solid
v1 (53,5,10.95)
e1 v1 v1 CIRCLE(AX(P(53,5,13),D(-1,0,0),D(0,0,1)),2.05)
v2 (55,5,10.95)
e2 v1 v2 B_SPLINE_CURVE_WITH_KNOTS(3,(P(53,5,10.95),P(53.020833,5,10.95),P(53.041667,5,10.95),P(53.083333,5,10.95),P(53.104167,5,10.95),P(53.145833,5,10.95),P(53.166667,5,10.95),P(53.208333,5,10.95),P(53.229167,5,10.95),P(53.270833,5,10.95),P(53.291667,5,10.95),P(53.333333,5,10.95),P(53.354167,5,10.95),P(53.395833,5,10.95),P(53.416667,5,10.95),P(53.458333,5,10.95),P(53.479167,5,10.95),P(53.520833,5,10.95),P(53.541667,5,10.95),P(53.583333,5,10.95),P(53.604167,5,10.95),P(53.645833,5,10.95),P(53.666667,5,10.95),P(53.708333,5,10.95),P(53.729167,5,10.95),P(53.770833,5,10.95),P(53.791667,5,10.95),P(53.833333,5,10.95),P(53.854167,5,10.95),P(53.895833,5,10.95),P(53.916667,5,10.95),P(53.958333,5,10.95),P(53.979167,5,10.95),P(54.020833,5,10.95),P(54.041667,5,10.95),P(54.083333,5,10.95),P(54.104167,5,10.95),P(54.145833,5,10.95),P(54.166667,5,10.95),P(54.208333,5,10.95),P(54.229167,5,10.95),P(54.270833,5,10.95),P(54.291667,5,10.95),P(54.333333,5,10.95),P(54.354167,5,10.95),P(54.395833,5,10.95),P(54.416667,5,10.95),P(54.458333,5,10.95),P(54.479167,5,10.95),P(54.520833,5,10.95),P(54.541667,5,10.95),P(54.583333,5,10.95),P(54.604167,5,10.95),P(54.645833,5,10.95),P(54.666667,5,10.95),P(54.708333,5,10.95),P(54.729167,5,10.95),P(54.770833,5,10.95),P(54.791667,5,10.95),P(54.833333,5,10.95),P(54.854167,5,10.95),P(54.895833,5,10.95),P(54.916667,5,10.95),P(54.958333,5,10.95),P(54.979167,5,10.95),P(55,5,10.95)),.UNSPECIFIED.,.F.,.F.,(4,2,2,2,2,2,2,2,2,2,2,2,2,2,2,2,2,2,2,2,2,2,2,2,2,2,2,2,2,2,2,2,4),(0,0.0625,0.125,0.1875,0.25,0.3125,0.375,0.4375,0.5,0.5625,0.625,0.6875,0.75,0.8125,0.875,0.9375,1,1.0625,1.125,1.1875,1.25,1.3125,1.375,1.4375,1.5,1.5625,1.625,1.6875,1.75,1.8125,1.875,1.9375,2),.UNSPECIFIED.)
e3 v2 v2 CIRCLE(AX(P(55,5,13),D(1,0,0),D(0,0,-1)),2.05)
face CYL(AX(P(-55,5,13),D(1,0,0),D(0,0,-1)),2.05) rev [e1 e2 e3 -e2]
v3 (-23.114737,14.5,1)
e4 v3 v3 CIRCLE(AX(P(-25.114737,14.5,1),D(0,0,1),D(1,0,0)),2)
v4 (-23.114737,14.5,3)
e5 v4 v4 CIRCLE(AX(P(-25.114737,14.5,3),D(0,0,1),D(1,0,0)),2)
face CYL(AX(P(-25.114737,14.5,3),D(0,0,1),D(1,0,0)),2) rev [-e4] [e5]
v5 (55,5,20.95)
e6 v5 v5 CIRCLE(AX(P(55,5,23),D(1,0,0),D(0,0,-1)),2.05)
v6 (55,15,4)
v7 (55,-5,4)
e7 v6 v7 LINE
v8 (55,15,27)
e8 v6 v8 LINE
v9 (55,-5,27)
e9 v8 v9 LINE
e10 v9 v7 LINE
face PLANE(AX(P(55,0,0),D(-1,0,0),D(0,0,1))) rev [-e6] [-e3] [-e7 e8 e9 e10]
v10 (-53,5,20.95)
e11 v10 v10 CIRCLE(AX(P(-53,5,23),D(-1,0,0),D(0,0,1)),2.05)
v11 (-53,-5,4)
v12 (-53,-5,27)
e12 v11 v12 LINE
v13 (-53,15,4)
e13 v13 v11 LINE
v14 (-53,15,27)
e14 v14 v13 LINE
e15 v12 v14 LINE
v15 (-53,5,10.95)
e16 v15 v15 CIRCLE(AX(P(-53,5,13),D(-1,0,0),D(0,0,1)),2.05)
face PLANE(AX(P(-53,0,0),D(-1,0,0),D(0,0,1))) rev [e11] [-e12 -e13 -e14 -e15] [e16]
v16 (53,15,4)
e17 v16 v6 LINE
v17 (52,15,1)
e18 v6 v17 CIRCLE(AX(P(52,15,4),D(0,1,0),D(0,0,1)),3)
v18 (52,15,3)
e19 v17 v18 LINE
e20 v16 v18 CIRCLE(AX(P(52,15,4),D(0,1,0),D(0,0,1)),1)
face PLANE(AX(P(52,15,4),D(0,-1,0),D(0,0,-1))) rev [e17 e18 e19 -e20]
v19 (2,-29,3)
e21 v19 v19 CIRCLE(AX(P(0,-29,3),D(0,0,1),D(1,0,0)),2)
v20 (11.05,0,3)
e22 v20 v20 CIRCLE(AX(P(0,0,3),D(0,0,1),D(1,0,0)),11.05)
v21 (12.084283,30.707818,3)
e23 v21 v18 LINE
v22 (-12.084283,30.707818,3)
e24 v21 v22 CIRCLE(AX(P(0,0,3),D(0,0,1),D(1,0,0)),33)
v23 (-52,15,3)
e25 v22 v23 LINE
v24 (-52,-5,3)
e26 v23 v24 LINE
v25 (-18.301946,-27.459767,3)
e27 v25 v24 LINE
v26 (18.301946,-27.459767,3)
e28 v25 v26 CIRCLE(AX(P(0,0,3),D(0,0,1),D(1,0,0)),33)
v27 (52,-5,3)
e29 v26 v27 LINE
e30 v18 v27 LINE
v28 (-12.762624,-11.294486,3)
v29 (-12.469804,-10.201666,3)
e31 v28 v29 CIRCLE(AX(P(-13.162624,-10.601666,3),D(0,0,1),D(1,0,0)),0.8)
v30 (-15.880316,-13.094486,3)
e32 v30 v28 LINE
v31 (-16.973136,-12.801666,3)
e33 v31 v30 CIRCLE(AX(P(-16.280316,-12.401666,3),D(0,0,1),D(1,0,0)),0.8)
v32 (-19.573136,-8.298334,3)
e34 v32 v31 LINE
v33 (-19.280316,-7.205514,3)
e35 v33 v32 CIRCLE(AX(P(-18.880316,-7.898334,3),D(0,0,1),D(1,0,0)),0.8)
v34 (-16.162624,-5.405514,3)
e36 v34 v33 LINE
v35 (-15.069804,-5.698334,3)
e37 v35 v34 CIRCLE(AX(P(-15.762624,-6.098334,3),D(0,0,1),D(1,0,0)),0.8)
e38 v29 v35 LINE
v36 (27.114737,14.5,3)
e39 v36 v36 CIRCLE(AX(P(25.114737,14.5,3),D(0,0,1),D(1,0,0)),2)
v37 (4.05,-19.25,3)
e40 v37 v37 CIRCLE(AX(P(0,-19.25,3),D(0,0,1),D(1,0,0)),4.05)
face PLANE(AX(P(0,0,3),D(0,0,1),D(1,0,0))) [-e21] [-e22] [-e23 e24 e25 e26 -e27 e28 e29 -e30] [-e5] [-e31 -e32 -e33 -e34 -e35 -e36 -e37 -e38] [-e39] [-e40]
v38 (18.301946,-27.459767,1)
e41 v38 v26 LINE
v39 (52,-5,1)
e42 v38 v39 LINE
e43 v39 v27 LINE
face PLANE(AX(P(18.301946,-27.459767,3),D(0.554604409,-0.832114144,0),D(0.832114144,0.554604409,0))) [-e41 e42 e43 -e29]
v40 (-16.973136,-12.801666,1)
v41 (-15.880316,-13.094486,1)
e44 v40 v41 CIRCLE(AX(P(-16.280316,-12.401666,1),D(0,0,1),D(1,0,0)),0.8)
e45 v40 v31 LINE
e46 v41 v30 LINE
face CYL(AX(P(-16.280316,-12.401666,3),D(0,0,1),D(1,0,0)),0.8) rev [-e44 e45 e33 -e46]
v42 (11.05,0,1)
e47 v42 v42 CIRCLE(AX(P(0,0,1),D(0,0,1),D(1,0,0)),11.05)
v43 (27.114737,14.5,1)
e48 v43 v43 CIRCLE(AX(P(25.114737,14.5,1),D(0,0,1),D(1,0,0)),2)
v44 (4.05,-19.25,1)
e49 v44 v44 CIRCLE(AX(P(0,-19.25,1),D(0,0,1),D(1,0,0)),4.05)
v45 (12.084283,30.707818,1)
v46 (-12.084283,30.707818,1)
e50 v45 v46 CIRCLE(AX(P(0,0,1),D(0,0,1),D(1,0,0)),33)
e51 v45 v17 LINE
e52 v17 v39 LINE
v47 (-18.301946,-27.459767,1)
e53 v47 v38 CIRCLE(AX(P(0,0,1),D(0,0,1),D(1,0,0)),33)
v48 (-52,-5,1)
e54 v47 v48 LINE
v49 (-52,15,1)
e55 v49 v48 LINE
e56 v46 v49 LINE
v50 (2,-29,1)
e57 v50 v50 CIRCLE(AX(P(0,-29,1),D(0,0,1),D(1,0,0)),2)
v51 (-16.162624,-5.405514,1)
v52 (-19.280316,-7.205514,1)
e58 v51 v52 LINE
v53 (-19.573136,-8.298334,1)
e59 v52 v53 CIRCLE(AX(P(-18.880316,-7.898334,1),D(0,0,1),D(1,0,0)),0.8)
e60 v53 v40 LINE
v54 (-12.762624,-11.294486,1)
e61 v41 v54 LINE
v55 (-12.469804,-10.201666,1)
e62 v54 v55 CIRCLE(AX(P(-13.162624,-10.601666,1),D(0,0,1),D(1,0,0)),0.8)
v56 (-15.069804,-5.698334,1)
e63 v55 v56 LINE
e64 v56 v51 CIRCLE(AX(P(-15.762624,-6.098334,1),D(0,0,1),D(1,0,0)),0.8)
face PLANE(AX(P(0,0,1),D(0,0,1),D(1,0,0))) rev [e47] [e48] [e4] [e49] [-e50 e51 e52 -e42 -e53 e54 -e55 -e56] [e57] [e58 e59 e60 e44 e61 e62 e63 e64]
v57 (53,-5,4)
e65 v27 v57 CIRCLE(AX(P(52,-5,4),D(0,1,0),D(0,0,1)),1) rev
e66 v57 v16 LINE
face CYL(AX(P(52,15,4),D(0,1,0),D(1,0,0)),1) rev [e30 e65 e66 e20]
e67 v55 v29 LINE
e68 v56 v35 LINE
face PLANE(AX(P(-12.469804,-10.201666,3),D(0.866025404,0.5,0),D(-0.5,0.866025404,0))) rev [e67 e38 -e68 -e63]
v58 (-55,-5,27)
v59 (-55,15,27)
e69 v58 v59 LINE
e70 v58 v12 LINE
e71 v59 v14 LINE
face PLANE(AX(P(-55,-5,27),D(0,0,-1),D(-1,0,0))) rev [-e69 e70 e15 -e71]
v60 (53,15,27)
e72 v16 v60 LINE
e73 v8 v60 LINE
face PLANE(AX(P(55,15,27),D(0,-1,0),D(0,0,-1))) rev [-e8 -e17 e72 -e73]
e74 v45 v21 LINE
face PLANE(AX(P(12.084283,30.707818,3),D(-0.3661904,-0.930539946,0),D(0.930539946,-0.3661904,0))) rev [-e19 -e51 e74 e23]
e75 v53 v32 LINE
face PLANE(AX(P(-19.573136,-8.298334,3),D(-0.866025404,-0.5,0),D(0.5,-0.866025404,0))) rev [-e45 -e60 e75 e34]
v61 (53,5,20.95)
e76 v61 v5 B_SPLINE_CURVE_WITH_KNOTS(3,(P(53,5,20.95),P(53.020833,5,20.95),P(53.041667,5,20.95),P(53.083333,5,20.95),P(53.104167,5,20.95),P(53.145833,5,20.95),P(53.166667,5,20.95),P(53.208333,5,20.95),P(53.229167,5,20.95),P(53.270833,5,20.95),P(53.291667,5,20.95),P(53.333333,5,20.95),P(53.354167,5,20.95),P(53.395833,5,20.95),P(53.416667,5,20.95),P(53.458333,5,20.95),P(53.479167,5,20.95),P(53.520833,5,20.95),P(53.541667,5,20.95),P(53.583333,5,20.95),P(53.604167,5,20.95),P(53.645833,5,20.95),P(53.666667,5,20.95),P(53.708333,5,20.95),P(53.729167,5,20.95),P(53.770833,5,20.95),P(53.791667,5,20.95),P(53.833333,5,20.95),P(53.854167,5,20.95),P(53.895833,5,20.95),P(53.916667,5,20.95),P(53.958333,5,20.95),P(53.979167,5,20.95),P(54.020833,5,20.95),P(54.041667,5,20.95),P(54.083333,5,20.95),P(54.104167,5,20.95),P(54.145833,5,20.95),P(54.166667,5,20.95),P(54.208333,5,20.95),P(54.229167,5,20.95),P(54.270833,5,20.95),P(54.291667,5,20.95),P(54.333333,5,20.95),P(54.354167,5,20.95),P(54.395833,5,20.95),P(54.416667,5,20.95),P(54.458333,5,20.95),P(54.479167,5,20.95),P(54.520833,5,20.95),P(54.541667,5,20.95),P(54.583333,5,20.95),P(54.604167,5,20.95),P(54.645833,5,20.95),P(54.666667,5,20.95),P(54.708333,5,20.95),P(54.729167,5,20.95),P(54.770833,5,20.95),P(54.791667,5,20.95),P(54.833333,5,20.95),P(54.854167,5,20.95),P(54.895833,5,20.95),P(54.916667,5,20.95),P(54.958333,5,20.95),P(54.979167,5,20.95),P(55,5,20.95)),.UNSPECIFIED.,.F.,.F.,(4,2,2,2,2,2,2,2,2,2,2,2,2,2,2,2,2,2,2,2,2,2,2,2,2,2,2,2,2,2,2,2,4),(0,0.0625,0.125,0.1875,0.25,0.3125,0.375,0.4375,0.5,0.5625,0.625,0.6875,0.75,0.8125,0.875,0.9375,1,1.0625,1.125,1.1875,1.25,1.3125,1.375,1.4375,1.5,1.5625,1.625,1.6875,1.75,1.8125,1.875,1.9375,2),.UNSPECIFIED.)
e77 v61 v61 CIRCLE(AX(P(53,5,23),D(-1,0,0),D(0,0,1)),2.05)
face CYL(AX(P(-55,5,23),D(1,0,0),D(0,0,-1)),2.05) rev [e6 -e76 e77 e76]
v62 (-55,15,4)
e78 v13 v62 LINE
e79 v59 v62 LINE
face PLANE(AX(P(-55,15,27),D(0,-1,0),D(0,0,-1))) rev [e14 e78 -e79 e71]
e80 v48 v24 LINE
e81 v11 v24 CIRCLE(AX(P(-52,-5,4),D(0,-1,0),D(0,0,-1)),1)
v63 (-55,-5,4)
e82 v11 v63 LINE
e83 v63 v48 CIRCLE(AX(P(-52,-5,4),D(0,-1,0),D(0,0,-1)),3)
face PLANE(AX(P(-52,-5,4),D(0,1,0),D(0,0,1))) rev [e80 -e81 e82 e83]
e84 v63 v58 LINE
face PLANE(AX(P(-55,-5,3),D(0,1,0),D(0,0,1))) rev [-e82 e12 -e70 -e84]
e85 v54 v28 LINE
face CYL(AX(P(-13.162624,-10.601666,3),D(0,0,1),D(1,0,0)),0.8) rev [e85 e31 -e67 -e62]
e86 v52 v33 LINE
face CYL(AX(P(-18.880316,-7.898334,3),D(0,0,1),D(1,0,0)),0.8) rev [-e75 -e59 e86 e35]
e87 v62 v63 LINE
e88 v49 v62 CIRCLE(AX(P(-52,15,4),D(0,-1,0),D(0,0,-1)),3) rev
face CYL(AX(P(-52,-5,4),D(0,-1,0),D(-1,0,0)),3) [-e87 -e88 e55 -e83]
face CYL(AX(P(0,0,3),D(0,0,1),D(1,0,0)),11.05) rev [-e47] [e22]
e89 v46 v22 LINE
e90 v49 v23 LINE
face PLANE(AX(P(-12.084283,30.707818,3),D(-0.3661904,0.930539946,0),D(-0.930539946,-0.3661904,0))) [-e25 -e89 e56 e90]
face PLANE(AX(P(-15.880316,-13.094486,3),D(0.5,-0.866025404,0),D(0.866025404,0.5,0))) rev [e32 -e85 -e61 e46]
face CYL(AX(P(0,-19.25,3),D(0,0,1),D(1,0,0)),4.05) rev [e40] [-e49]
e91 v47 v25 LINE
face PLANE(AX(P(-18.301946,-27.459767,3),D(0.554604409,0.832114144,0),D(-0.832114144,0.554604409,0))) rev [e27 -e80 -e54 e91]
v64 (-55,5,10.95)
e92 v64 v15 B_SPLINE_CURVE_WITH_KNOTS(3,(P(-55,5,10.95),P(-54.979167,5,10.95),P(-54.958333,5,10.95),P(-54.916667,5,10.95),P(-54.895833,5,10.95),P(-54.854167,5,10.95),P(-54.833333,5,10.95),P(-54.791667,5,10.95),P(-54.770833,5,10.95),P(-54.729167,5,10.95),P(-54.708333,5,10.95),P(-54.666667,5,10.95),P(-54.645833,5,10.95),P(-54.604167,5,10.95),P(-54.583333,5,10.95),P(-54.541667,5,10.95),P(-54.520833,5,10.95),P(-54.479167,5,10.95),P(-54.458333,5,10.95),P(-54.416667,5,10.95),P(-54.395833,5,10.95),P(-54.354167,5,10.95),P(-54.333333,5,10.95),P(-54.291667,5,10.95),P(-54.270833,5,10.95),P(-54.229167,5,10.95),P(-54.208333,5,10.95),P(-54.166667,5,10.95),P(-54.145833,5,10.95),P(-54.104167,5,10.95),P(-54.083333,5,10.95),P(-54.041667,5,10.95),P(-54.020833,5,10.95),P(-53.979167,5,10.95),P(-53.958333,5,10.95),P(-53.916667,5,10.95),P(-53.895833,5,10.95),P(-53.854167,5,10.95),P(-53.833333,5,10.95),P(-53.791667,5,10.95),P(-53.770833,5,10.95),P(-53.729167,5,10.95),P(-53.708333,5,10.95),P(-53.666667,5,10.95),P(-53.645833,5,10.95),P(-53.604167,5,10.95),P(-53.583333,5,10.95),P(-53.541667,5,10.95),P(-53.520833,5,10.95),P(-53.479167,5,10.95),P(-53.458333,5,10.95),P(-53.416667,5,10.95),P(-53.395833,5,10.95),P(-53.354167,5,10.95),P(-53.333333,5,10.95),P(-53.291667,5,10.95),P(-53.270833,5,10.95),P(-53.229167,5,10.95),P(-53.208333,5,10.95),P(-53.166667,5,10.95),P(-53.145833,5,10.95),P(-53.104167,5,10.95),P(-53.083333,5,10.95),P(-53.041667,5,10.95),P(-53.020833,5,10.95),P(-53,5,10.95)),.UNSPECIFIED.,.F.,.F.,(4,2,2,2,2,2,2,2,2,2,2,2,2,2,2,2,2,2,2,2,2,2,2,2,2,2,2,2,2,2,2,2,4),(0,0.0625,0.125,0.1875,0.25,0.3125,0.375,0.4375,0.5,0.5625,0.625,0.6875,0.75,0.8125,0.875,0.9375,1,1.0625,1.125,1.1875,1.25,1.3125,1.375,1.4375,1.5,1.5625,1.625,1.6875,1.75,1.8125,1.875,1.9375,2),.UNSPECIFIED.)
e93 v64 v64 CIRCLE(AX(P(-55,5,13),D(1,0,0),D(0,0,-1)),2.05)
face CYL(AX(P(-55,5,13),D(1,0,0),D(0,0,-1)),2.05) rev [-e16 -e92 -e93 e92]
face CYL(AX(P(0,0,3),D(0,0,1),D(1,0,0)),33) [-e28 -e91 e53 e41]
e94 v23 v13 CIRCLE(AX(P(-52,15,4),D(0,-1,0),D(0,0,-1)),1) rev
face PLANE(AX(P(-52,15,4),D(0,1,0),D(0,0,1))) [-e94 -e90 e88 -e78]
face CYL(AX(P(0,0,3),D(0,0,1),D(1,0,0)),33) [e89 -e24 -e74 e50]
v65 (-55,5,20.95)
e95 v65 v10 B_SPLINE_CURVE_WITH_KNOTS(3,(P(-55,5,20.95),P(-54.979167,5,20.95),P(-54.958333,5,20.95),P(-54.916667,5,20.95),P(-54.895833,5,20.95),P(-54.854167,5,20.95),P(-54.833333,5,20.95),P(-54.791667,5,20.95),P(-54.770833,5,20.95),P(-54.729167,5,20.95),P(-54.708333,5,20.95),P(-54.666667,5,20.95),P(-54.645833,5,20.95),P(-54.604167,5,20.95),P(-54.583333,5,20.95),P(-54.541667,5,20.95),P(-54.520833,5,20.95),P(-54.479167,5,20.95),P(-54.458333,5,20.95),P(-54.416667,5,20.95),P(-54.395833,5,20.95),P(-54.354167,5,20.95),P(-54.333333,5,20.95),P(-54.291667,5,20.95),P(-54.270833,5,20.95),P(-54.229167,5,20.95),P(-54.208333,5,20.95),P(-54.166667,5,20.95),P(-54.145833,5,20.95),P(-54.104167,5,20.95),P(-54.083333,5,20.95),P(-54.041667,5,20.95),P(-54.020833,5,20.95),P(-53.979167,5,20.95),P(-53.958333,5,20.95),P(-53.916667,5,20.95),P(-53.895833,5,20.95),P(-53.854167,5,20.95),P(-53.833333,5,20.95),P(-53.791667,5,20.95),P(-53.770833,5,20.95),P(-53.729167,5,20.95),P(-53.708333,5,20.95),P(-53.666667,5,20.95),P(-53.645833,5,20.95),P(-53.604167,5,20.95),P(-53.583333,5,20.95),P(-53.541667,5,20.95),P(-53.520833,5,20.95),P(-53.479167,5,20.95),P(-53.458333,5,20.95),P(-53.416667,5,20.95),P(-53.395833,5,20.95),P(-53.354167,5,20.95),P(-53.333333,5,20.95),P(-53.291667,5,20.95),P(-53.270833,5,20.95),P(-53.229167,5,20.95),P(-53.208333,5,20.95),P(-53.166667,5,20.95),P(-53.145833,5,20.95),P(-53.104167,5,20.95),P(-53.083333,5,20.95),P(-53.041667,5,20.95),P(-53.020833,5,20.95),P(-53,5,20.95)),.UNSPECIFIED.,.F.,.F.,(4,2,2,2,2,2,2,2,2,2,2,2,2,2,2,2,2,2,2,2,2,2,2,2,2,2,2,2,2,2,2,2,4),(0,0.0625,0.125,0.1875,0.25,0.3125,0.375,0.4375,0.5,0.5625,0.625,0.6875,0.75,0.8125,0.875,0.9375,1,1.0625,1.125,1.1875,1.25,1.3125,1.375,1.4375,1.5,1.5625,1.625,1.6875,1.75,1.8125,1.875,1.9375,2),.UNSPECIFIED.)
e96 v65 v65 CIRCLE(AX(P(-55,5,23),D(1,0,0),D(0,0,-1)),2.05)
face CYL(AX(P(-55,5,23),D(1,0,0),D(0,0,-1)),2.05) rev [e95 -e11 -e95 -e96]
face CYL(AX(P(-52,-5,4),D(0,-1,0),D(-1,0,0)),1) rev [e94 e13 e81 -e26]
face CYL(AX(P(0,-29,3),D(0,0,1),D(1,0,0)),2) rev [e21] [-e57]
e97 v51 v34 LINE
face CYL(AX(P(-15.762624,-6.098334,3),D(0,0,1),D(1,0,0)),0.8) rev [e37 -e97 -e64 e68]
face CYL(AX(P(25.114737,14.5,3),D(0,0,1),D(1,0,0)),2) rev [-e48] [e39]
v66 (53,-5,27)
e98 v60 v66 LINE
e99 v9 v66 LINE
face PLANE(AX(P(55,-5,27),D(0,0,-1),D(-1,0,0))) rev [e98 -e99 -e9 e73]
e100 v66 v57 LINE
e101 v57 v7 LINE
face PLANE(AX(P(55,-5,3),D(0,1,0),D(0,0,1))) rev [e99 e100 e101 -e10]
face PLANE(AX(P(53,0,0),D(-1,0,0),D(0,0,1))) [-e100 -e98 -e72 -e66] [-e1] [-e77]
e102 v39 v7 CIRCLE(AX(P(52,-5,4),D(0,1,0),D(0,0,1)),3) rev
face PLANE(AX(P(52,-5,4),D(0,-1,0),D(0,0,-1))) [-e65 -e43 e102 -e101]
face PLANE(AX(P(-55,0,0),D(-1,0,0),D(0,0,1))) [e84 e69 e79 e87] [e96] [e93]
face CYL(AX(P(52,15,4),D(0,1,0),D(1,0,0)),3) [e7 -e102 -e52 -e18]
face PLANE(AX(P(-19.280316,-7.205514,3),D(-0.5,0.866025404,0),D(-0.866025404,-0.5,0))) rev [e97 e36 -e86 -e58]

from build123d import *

# Parameters (mm, degrees)
SKETCH_1_R                  = 33
SKETCH_1_R_2                = 11.05
SKETCH_1_R_3                = 4.05
SKETCH_1_R_4                = 2
EXTRUDE_1_DEPTH             = 3
EXTRUDE_2_DEPTH             = 3
SHEET_METAL_1_OUTLINE_R     = 2
SHEET_METAL_1_OUTLINE_R_2   = 4.05
SHEET_METAL_1_OUTLINE_R_3   = 11.05
SHEET_METAL_1_DEPTH         = 1
SM_EDGE_FLANGE_1_DEPTH      = 20
SM_EDGE_FLANGE_1_BEND_DEPTH = 20
SKETCH_13_R                 = 2.05
CUT_EXTRUDE_1_DEPTH         = 118.974573532


# Read off the part's stored shape, not the designer's step: 转换实体1
# Sheet-metal steps are written as plain solids
with BuildPart() as part:
    # Sketch 1 → 凸台-拉伸1 (new body)
    with BuildSketch(Plane.XY):
        Circle(SKETCH_1_R)
        Circle(SKETCH_1_R_2, mode=Mode.SUBTRACT)
        with Locations((0, -19.25)):
            Circle(SKETCH_1_R_3, mode=Mode.SUBTRACT)
        with Locations((25.11473671, 14.5)):
            Circle(SKETCH_1_R_4, mode=Mode.SUBTRACT)
        with Locations((0, -29)):
            Circle(SKETCH_1_R_4, mode=Mode.SUBTRACT)
        with Locations((-25.11473671, 14.5)):
            Circle(SKETCH_1_R_4, mode=Mode.SUBTRACT)
        with BuildLine():
            Line((-19.57313602, -8.29833395), (-16.97313602, -12.80166605))
            ThreePointArc((-16.97313602, -12.80166605), (-16.487370933, -13.174406711), (-15.880315697, -13.094486373))
            Line((-15.880315697, -13.094486373), (-12.762624243, -11.294486373))
            ThreePointArc((-12.762624243, -11.294486373), (-12.389883582, -10.808721286), (-12.46980392, -10.20166605))
            Line((-12.46980392, -10.20166605), (-15.06980392, -5.69833395))
            ThreePointArc((-15.06980392, -5.69833395), (-15.555569007, -5.325593289), (-16.162624243, -5.405513627))
            Line((-16.162624243, -5.405513627), (-19.280315697, -7.205513627))
            ThreePointArc((-19.280315697, -7.205513627), (-19.653056358, -7.691278714), (-19.57313602, -8.29833395))
        make_face(mode=Mode.SUBTRACT)
    extrude(amount=EXTRUDE_1_DEPTH)

    # 草图3 → 凸台-拉伸2 (add)
    with BuildSketch(Plane.XY):
        with BuildLine():
            ThreePointArc((-18.301945503, -27.459766765), (-32.813072233, 3.507462139), (-12.084283208, 30.707818212))
            Line((-12.084283208, 30.707818212), (-52, 15))
            Line((-52, 15), (-52, -5))
            Line((-52, -5), (-18.301945503, -27.459766765))
        make_face()
        with BuildLine():
            ThreePointArc((18.301945503, -27.459766765), (32.813072233, 3.507462139), (12.084283208, 30.707818212))
            Line((12.084283208, 30.707818212), (52, 15))
            Line((52, 15), (52, -5))
            Line((52, -5), (18.301945503, -27.459766765))
        make_face()
    extrude(amount=EXTRUDE_2_DEPTH)

    # Sheet Metal 1 outline → Sheet Metal 1 (cut)
    with BuildSketch(Plane.XY):
        with BuildLine():
            ThreePointArc((-18.301945503, -27.459766765), (0, -33), (18.301945503, -27.459766765))
            Line((18.301945503, -27.459766765), (52, -5))
            Line((52, -5), (52, 15))
            Line((52, 15), (12.084283208, 30.707818212))
            ThreePointArc((12.084283208, 30.707818212), (0, 33), (-12.084283208, 30.707818212))
            Line((-12.084283208, 30.707818212), (-52, 15))
            Line((-52, 15), (-52, -5))
            Line((-52, -5), (-18.301945503, -27.459766765))
        make_face()
        with BuildLine():
            Line((-16.97313602, -12.80166605), (-19.57313602, -8.29833395))
            ThreePointArc((-19.57313602, -8.29833395), (-19.653056358, -7.691278714), (-19.280315697, -7.205513627))
            Line((-19.280315697, -7.205513627), (-16.162624243, -5.405513627))
            ThreePointArc((-16.162624243, -5.405513627), (-15.555569007, -5.325593289), (-15.06980392, -5.69833395))
            Line((-15.06980392, -5.69833395), (-12.46980392, -10.20166605))
            ThreePointArc((-12.46980392, -10.20166605), (-12.389883582, -10.808721286), (-12.762624243, -11.294486373))
            Line((-12.762624243, -11.294486373), (-15.880315697, -13.094486373))
            ThreePointArc((-15.880315697, -13.094486373), (-16.487370933, -13.174406711), (-16.97313602, -12.80166605))
        make_face(mode=Mode.SUBTRACT)
        with Locations((0, -29)):
            Circle(SHEET_METAL_1_OUTLINE_R, mode=Mode.SUBTRACT)
        with Locations((0, -19.25)):
            Circle(SHEET_METAL_1_OUTLINE_R_2, mode=Mode.SUBTRACT)
        with Locations((-25.11473671, 14.5)):
            Circle(SHEET_METAL_1_OUTLINE_R, mode=Mode.SUBTRACT)
        Circle(SHEET_METAL_1_OUTLINE_R_3, mode=Mode.SUBTRACT)
        with Locations((25.11473671, 14.5)):
            Circle(SHEET_METAL_1_OUTLINE_R, mode=Mode.SUBTRACT)
    extrude(amount=SHEET_METAL_1_DEPTH, mode=Mode.SUBTRACT)

    # 边线-法兰1 section (across the edge) → 边线-法兰1 (add)
    with BuildSketch(Plane(origin=(53, -5, 3), x_dir=(-1, 0, 0), z_dir=(0, 1, 0))):
        with BuildLine():
            Line((-2, 1), (-2, 24))
            Line((-2, 24), (0, 24))
            Line((0, 24), (0, 1))
            ThreePointArc((0, 1), (0.292893219, 0.292893219), (1, 0))
            Line((1, 0), (1, -2))
            ThreePointArc((1, -2), (-1.121320344, -1.121320344), (-2, 1))
        make_face()
    extrude(amount=SM_EDGE_FLANGE_1_DEPTH)

    # 边线-法兰1 section 2 (across the edge) → 边线-法兰1 bend (add)
    with BuildSketch(Plane(origin=(-53, 15, 3), x_dir=(1, 0, 0), z_dir=(0, -1, 0))):
        with BuildLine():
            Line((-2, 1), (-2, 24))
            Line((-2, 24), (0, 24))
            Line((0, 24), (0, 1))
            ThreePointArc((0, 1), (0.292893219, 0.292893219), (1, 0))
            Line((1, 0), (1, -2))
            ThreePointArc((1, -2), (-1.121320344, -1.121320344), (-2, 1))
        make_face()
    extrude(amount=SM_EDGE_FLANGE_1_BEND_DEPTH)

    # 草图13 → 切除-拉伸1 (cut, through all)
    with BuildSketch(Plane(origin=(55, 0, 0), x_dir=(0, 0, -1), z_dir=(1, 0, 0))):
        with Locations((-23, 5)):
            Circle(SKETCH_13_R)
        with Locations((-13, 5)):
            Circle(SKETCH_13_R)
    extrude(amount=-CUT_EXTRUDE_1_DEPTH, mode=Mode.SUBTRACT)


solid = part.part
